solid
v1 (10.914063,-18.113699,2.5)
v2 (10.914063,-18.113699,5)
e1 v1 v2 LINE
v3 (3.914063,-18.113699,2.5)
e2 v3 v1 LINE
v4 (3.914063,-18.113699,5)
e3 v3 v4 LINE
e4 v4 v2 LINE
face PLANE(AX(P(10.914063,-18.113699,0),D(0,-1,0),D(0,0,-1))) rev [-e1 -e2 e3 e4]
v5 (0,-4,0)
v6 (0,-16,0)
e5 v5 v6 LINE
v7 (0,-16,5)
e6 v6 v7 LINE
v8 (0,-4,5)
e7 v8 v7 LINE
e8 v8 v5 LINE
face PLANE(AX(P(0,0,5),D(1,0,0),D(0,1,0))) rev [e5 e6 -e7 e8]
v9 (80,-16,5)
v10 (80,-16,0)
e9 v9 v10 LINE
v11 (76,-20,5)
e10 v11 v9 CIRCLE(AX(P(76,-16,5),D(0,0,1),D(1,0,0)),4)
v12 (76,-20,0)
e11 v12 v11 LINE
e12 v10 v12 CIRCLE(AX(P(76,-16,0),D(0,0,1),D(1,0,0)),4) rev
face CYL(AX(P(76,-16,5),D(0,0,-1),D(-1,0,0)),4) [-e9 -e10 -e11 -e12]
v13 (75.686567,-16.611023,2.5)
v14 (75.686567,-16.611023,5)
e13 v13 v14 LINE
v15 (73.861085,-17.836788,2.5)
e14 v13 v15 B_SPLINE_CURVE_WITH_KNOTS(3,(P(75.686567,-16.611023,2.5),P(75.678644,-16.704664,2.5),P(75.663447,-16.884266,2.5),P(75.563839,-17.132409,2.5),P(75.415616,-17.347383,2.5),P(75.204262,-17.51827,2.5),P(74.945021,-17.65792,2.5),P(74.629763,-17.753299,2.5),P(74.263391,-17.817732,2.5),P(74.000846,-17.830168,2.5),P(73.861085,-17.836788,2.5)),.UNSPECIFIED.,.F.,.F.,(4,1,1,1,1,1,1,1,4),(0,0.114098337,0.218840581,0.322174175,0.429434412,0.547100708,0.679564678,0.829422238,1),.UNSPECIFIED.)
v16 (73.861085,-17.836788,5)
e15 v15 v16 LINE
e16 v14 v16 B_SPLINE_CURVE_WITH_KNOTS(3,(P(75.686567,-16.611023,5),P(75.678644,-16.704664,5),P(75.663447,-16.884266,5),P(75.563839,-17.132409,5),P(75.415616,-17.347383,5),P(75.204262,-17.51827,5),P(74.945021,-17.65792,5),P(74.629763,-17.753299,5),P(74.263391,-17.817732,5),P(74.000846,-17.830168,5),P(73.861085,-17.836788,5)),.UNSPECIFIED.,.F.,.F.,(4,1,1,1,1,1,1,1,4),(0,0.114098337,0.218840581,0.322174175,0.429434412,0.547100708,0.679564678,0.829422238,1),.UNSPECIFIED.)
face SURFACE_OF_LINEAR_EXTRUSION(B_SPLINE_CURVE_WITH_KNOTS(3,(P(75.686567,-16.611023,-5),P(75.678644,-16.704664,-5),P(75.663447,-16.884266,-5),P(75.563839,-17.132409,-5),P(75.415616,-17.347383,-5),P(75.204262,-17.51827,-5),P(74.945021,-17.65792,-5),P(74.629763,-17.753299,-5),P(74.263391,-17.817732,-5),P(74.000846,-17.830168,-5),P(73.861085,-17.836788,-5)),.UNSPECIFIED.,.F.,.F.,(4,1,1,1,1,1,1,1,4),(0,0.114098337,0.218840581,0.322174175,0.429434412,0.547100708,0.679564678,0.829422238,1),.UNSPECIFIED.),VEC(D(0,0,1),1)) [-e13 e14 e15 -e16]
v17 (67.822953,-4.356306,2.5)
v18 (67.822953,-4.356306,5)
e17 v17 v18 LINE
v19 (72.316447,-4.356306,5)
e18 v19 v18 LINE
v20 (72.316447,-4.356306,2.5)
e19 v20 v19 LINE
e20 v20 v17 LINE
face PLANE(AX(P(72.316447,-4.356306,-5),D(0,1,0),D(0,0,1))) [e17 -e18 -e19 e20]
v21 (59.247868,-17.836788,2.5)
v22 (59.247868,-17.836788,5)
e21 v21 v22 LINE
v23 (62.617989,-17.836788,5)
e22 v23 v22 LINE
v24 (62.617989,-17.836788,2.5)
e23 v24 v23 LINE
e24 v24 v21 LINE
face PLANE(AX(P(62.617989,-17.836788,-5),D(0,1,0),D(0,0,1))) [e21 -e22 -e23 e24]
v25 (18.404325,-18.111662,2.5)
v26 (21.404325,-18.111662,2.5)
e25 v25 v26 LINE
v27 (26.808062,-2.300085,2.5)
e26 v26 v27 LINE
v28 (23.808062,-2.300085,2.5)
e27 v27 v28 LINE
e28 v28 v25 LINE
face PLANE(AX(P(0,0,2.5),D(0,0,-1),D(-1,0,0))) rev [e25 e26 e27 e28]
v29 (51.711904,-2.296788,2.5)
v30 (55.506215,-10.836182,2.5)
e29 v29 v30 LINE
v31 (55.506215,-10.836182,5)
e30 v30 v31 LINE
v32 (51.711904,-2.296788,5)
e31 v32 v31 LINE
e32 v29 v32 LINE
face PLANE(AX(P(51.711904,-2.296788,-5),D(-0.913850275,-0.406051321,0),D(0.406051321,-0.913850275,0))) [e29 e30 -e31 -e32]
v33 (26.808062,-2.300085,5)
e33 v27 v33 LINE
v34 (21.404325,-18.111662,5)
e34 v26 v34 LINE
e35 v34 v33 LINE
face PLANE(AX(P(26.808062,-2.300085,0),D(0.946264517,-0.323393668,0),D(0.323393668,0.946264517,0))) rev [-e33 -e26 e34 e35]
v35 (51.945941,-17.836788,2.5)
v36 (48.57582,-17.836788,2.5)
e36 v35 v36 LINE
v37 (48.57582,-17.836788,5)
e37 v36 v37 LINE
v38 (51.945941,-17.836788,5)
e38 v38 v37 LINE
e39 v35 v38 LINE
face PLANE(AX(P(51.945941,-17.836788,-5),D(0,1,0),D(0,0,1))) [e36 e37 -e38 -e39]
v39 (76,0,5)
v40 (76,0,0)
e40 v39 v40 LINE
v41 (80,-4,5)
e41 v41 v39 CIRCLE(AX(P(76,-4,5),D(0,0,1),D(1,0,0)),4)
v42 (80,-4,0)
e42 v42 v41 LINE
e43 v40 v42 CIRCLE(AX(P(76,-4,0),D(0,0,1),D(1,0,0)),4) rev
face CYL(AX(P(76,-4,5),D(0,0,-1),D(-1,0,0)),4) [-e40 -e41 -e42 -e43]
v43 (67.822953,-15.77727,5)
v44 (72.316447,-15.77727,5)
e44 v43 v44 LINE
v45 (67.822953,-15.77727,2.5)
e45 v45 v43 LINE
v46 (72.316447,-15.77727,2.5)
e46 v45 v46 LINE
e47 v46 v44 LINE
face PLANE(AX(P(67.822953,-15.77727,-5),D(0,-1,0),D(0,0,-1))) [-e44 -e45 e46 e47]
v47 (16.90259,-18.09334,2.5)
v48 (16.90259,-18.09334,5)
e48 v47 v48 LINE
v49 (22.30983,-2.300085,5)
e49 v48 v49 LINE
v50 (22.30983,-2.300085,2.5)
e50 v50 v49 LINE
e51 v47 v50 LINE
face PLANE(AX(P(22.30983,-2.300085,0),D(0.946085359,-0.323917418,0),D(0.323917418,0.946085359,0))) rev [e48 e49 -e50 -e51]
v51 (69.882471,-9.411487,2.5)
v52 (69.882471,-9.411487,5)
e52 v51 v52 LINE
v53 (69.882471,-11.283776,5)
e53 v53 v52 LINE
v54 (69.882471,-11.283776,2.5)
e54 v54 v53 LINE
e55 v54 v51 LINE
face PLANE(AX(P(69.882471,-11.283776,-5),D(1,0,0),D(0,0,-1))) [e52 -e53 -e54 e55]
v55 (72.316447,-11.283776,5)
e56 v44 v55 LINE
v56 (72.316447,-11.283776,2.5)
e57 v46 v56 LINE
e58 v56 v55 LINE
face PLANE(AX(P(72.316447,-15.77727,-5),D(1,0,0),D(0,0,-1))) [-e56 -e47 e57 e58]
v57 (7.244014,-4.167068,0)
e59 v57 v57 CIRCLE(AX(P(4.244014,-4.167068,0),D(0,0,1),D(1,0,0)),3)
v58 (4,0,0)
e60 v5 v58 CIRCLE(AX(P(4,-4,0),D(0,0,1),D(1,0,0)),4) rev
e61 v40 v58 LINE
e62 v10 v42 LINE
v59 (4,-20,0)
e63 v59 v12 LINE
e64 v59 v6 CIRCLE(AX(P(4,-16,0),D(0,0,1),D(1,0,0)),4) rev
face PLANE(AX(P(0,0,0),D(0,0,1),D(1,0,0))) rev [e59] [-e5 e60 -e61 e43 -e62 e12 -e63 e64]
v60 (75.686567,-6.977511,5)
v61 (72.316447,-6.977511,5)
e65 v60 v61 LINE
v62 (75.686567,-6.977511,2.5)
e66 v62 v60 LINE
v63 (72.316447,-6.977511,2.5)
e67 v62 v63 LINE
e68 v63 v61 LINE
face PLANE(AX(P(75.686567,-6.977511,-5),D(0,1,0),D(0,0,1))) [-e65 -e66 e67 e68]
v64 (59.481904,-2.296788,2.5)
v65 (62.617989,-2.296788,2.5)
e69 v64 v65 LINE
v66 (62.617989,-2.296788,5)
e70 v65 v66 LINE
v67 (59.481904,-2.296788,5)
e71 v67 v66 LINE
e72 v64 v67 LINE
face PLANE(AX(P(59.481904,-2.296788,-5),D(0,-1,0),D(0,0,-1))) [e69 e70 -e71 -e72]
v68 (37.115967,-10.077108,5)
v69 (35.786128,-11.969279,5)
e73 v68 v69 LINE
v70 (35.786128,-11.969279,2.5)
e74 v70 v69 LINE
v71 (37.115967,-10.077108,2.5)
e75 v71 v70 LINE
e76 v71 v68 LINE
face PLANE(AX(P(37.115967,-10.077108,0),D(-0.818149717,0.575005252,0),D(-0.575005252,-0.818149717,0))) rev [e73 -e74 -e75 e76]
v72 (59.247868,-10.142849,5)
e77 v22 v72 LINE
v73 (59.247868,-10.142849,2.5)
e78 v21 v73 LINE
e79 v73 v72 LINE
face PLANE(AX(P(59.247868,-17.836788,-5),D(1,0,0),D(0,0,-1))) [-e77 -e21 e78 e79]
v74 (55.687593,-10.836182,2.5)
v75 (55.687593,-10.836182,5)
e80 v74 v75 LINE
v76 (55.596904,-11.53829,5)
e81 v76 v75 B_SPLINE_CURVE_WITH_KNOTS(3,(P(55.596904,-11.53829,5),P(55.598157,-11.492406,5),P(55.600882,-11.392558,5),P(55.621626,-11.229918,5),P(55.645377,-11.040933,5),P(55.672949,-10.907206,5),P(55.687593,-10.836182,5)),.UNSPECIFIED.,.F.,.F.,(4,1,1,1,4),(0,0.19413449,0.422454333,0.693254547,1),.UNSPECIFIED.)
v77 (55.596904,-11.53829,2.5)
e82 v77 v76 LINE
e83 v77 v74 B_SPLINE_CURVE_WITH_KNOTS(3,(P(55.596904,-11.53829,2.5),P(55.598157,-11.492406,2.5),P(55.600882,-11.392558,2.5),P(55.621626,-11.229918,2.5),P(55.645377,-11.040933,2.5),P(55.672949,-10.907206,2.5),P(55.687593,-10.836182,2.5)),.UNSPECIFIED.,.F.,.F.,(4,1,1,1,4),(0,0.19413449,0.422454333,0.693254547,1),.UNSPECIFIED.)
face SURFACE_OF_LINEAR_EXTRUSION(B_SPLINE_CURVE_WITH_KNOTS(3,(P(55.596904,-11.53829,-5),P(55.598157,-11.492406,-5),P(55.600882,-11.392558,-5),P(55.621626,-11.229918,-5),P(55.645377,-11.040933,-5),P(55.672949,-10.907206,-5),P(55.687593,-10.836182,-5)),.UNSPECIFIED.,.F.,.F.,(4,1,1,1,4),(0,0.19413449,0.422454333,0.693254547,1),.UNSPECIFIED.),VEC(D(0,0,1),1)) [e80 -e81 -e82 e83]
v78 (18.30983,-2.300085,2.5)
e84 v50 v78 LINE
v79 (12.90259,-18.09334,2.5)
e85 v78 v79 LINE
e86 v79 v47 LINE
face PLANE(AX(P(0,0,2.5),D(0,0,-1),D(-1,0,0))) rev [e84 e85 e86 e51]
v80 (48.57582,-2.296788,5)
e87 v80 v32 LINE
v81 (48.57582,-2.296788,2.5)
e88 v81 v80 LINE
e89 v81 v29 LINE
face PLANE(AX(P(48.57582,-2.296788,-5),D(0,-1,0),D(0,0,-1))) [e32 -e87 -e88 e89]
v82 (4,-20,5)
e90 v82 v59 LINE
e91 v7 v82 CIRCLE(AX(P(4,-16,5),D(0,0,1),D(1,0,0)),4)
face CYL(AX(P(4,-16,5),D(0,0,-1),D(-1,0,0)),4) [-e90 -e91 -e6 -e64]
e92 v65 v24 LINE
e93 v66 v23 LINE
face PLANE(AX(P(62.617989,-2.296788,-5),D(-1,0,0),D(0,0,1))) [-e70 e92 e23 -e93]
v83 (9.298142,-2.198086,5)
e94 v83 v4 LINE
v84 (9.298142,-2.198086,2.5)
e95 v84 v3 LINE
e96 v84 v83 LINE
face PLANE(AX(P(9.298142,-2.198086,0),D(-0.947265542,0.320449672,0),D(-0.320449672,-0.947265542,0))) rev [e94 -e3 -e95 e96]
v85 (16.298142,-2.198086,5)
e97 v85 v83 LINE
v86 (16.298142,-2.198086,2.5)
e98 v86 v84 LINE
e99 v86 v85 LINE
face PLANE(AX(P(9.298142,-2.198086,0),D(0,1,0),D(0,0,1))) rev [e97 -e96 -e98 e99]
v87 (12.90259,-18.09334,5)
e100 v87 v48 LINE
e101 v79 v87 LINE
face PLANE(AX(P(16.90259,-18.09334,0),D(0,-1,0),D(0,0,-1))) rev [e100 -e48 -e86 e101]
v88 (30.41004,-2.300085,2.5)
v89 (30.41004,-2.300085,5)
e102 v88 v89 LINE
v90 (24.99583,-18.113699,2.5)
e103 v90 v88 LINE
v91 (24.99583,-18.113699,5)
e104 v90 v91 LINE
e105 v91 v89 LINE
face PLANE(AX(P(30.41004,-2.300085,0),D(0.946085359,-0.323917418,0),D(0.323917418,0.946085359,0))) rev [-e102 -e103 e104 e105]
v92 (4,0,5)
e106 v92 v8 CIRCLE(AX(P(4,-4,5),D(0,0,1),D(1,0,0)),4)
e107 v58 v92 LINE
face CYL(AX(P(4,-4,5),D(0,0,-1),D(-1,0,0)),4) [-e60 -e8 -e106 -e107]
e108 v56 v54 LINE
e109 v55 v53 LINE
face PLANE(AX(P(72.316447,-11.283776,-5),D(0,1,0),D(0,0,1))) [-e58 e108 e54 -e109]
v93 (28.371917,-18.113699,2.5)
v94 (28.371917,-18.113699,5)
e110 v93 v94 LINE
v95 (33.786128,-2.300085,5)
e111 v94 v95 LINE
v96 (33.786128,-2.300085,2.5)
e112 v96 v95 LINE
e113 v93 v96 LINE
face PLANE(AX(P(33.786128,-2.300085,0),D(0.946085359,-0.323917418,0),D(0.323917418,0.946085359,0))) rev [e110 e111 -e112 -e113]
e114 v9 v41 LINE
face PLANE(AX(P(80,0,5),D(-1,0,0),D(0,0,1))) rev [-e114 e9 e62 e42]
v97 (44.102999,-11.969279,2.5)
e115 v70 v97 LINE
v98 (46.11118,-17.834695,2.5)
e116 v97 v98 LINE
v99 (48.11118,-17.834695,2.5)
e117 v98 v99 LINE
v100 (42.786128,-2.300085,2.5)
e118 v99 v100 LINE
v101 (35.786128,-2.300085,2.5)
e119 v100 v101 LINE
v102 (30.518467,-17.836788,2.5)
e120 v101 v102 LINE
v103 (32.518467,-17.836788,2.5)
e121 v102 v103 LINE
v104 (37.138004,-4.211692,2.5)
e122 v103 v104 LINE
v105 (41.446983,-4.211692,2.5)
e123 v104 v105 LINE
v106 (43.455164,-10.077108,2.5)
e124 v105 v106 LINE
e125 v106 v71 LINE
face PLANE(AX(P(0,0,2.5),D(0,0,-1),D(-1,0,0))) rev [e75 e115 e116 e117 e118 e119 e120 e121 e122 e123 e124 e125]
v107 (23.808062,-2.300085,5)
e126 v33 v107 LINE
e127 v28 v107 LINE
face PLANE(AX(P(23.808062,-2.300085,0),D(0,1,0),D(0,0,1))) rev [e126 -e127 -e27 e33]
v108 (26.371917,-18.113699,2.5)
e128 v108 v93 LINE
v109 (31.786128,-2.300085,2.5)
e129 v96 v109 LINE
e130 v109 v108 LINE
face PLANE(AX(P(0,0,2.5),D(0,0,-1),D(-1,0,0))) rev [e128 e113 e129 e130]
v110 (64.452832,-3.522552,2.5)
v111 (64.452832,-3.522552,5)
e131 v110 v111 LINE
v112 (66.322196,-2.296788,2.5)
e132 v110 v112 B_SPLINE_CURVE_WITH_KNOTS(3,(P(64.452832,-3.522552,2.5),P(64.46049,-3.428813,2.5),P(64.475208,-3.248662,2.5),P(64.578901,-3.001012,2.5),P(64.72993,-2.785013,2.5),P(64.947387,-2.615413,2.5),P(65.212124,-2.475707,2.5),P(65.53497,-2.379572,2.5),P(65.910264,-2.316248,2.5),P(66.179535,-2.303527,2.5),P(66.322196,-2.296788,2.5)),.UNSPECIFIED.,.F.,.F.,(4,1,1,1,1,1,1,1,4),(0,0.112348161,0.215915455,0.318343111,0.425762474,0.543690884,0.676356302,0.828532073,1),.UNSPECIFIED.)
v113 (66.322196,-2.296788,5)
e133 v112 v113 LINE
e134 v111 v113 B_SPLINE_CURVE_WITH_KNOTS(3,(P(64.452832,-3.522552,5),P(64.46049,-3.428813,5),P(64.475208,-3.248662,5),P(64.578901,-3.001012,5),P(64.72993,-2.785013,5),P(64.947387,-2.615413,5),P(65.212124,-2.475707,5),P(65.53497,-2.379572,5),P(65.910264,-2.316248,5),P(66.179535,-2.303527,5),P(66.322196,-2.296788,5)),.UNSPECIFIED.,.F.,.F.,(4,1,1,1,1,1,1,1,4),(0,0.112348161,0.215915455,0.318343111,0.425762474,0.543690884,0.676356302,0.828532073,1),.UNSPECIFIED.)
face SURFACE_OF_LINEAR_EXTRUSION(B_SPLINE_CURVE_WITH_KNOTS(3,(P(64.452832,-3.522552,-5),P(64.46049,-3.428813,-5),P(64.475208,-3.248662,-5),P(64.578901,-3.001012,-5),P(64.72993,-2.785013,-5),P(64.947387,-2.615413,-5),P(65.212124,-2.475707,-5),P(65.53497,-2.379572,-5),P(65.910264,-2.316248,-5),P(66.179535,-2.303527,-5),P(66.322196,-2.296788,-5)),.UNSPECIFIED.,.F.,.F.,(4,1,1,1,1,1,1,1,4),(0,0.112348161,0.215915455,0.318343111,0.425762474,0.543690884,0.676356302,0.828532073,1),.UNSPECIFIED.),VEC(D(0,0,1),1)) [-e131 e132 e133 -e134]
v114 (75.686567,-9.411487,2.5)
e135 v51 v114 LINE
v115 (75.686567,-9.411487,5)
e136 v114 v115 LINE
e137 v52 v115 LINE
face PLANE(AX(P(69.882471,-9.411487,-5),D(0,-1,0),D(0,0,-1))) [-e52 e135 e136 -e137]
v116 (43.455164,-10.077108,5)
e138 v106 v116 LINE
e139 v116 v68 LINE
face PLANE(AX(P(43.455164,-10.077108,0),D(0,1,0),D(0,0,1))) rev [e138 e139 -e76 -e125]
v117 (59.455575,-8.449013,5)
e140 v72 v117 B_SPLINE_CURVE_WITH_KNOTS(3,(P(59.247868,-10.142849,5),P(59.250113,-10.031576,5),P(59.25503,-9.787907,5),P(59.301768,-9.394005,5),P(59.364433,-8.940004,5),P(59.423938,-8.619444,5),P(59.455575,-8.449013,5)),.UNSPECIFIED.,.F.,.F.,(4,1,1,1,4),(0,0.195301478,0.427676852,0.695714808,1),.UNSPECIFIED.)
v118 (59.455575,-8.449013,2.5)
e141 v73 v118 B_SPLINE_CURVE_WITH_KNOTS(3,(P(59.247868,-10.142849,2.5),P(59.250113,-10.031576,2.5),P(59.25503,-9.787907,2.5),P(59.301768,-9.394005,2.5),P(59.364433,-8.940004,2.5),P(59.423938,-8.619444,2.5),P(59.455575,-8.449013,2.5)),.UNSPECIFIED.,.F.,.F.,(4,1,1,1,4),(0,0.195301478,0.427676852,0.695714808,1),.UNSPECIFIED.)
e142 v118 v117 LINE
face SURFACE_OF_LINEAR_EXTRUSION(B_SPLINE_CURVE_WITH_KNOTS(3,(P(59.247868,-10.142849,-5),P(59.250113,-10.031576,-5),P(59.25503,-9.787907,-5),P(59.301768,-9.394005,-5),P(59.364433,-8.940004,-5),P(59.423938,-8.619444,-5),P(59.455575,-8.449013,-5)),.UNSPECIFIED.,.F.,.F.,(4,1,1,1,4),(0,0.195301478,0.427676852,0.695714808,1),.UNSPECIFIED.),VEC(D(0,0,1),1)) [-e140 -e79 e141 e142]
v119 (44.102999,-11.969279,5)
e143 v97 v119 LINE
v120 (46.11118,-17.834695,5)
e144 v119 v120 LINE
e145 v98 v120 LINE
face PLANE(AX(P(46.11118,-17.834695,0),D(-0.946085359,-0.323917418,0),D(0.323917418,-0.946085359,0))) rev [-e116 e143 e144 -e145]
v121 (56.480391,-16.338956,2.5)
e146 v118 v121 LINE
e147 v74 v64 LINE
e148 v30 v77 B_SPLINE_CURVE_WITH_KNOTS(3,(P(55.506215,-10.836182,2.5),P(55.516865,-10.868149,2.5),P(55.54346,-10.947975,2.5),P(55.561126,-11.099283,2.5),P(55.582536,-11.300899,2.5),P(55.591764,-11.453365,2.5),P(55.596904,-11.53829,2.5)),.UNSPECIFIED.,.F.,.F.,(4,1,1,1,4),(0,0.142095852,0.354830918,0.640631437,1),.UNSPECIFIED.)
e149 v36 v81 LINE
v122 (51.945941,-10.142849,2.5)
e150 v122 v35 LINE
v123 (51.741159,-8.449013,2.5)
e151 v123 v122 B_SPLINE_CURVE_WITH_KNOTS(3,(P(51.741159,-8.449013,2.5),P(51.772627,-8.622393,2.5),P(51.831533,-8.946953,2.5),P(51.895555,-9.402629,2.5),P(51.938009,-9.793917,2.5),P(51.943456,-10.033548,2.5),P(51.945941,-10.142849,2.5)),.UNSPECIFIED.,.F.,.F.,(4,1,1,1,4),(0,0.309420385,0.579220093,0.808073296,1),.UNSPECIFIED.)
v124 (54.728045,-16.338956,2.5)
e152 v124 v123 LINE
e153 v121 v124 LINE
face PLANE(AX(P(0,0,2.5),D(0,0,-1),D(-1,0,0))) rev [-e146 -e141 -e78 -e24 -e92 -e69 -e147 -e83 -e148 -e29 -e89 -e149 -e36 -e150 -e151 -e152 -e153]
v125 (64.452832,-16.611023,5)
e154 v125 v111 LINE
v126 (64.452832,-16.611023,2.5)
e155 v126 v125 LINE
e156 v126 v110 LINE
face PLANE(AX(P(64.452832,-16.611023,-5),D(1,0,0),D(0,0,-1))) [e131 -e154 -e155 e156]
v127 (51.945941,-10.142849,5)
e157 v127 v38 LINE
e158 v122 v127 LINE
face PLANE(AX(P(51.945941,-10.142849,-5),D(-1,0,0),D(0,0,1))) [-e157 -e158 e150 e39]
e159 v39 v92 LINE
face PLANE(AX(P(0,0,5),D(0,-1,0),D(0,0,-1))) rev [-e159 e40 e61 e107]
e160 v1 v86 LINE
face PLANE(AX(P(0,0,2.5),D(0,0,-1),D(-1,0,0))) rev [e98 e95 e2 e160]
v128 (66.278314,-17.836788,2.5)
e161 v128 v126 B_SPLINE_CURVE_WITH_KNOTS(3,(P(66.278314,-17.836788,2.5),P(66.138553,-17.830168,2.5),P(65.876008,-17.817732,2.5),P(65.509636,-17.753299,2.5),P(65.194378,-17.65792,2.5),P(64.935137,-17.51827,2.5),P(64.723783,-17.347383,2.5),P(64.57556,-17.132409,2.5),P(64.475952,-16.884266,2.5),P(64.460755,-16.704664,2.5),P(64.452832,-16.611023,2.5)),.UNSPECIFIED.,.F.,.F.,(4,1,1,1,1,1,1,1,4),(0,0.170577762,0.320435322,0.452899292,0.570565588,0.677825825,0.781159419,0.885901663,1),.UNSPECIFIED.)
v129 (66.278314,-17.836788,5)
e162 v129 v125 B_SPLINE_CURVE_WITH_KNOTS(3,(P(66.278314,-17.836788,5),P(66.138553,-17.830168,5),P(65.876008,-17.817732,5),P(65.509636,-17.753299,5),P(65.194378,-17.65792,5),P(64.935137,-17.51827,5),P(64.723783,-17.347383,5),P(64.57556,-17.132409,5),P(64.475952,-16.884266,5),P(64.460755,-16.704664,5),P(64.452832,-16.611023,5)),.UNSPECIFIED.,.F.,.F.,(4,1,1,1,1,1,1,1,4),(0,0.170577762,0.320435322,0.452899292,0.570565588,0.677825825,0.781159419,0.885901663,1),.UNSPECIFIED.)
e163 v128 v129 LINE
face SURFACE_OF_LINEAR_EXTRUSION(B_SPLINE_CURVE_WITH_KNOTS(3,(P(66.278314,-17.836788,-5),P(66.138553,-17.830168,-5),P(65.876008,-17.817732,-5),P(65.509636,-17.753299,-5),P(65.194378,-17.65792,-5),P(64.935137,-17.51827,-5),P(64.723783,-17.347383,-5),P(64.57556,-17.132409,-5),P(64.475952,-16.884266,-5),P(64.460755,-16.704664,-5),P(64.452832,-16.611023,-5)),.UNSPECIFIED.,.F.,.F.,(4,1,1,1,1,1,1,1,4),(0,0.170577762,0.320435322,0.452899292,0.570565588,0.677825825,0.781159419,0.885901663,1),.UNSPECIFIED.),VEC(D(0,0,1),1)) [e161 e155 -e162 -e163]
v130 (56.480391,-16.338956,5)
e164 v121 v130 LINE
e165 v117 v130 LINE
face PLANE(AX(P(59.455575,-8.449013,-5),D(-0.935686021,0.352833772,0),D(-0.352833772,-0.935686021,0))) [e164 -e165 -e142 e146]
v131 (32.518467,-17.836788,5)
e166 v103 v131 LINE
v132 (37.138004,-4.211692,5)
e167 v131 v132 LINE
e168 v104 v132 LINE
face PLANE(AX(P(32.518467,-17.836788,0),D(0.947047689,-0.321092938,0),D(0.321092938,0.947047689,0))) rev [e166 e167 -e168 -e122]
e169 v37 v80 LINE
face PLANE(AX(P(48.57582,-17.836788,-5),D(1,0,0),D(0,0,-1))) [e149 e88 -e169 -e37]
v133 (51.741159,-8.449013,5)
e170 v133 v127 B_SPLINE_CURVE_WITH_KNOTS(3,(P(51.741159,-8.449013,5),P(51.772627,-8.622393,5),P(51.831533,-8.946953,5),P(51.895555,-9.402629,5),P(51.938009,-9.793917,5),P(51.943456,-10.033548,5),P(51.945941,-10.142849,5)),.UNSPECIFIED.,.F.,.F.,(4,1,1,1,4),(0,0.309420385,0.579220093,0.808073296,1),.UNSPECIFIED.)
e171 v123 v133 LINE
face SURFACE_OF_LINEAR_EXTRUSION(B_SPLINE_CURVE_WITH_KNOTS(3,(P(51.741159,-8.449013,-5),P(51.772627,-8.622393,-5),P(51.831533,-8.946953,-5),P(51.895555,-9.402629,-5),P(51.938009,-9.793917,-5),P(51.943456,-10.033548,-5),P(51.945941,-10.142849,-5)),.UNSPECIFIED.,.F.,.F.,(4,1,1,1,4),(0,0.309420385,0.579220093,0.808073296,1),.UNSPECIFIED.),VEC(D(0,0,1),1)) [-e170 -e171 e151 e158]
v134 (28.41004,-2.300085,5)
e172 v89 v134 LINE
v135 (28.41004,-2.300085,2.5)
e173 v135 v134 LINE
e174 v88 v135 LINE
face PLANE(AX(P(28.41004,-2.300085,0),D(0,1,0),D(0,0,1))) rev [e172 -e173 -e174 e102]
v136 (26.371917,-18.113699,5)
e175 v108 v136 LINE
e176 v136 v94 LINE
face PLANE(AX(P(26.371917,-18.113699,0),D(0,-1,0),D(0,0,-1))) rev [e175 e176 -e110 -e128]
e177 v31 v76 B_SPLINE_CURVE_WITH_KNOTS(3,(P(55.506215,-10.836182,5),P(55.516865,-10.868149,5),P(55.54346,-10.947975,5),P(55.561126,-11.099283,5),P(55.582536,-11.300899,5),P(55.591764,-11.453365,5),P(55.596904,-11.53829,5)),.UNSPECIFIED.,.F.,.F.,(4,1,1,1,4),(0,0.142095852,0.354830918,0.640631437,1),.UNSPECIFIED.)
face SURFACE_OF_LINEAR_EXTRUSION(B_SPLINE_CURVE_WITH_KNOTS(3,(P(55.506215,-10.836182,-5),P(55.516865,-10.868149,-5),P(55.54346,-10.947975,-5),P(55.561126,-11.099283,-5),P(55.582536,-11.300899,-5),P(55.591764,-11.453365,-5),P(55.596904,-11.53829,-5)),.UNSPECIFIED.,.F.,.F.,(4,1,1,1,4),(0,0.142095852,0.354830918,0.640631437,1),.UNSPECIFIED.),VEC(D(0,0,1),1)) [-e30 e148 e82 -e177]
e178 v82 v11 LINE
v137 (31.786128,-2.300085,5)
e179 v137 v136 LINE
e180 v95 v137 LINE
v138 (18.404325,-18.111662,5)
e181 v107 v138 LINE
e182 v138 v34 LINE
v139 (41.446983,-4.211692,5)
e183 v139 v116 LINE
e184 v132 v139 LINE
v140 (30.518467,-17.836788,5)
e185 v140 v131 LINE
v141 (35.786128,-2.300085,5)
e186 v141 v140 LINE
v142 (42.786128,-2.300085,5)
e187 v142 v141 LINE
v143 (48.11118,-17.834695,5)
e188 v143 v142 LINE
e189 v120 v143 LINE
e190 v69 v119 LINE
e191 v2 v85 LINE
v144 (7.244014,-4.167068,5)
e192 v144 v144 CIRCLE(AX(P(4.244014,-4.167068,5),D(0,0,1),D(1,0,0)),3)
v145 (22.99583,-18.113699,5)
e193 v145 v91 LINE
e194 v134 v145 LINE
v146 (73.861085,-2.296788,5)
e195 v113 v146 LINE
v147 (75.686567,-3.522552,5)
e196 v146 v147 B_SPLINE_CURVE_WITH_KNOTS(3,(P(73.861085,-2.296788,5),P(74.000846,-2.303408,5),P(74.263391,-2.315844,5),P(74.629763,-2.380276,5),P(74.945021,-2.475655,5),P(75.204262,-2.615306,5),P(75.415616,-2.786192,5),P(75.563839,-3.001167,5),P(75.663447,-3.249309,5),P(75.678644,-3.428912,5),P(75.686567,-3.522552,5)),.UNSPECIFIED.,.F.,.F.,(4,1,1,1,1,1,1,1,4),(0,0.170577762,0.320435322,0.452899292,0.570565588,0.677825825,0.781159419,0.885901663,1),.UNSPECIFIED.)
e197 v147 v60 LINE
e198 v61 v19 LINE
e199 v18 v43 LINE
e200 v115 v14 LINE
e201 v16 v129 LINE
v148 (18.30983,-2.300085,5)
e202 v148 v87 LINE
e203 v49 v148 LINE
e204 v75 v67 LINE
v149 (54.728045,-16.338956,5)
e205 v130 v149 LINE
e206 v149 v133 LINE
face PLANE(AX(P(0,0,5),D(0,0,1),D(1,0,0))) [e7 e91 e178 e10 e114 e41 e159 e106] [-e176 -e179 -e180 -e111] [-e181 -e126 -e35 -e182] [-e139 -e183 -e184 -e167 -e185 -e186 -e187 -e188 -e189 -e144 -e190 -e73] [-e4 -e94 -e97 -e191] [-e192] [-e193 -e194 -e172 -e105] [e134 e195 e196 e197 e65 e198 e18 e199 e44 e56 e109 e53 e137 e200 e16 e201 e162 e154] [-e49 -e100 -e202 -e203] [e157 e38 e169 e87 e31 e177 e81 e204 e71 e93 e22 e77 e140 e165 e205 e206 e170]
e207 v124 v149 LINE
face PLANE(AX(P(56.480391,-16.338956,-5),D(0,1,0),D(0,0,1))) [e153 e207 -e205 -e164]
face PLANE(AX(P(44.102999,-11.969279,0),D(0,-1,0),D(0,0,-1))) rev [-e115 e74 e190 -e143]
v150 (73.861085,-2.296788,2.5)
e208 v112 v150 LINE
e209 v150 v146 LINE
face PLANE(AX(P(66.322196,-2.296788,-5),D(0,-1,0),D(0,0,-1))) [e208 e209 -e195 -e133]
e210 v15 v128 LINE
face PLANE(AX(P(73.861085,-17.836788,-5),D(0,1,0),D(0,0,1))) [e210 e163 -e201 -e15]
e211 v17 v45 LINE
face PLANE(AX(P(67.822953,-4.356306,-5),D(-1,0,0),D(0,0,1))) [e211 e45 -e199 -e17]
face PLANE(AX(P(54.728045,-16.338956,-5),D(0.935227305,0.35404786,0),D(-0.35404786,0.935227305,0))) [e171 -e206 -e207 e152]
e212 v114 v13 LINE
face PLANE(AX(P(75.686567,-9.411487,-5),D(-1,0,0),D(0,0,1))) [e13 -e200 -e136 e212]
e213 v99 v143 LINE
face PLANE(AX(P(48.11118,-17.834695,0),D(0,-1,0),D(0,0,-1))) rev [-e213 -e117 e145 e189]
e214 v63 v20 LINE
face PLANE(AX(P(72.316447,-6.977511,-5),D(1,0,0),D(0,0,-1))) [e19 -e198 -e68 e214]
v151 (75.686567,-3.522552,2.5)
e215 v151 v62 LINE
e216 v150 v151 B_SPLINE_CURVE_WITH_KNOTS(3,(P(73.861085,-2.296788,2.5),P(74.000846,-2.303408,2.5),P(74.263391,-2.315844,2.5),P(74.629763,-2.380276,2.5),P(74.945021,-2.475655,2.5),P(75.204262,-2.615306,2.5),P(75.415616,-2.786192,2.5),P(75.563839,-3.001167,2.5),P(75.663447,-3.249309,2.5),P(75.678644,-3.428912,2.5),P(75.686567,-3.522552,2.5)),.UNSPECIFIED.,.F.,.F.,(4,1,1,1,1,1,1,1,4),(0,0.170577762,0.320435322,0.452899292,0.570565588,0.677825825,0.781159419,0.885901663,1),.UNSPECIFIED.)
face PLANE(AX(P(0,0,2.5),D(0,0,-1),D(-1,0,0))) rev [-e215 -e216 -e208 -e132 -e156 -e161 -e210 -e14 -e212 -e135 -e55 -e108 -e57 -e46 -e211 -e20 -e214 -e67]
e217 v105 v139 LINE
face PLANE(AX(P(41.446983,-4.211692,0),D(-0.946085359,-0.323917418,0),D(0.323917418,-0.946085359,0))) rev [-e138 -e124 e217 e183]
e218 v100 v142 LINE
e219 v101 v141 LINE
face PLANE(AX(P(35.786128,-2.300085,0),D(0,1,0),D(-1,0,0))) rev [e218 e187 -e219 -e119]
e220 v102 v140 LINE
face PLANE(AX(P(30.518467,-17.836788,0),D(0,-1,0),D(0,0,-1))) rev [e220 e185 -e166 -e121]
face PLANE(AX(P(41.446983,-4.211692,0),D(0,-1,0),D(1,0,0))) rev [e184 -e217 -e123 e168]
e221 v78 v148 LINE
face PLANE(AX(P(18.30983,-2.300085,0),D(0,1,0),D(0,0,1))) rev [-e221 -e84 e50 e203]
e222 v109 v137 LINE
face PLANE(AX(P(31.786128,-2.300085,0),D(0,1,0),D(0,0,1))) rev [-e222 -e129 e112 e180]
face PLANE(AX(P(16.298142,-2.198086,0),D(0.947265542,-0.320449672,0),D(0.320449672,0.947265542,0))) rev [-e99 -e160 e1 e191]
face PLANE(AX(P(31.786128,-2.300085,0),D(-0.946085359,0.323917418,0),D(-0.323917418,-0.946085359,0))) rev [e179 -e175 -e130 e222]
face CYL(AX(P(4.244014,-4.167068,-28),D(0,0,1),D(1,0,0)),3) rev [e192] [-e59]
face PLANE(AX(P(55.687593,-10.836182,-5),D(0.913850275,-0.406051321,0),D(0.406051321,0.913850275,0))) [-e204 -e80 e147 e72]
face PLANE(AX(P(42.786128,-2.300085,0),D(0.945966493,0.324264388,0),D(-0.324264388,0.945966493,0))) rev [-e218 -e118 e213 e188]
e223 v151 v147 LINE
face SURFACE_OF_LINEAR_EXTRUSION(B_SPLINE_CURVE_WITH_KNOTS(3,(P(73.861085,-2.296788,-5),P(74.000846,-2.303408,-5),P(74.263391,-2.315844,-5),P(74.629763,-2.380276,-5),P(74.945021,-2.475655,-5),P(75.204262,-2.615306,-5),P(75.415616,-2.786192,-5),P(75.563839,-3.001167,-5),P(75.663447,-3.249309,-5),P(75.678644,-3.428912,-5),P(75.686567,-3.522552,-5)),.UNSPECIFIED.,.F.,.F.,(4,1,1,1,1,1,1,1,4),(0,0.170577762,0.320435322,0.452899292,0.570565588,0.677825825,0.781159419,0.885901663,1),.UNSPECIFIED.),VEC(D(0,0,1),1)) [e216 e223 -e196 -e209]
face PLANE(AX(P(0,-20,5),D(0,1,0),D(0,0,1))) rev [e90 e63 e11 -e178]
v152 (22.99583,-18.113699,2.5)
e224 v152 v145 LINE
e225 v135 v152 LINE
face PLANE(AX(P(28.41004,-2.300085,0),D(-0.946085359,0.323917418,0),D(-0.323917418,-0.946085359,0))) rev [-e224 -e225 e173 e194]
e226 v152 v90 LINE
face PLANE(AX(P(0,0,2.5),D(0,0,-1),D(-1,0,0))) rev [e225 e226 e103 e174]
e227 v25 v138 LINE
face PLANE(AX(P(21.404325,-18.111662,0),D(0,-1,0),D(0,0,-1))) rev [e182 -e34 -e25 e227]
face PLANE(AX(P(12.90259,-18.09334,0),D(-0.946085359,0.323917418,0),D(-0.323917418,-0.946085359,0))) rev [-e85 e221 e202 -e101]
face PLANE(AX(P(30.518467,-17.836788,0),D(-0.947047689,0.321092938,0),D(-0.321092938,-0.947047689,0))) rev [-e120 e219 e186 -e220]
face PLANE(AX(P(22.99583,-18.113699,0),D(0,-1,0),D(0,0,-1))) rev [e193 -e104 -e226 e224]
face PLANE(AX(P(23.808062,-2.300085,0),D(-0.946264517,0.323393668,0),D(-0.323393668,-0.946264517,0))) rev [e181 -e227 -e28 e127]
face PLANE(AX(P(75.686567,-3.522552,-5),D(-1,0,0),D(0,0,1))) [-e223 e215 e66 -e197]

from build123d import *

# Parameters (mm, degrees)
ESQUISSE1_W                  = 80
ESQUISSE1_H                  = 20
BOSS_EXTRU_1_DEPTH           = 5
CONG_1_R                     = 4
ENL_V_MAT_EXTRU_1_DEPTH      = 83.613558209
ENL_V_START                  = -5
ENL_V_MAT_EXTRU_2_DEPTH      = 5
ESQUISSE11_W                 = 13.611032385
ESQUISSE11_H                 = 17.64061434
BOSS_EXTRU_8_DEPTH           = 5
ENL_V_MAT_EXTRU_3_DEPTH      = 83.613558336
ENL_V_MAT_EXTRU_3_DEPTH_BACK = 83.613558336
ESQUISSE13_R                 = 3
ENL_V_MAT_EXTRU_4_DEPTH      = 33
BOSS_EXTRU_9_DEPTH           = 2.5


# Read off the part's stored shape, not the designer's step: Enlèv. mat.-Extru.2
with BuildPart() as part:
    # Esquisse1 → Boss.-Extru.1 (new body)
    with BuildSketch(Plane.XY):
        with Locations((40, -10)):
            Rectangle(ESQUISSE1_W, ESQUISSE1_H)
    extrude(amount=BOSS_EXTRU_1_DEPTH)

    # Congé1
    cong_1_edges = [part.edges().sort_by_distance(p)[0] for p in [
        (0, 0, 2.5),
        (80, 0, 2.5),
        (80, -20, 2.5),
        (0, -20, 2.5),
    ]]
    fillet(cong_1_edges, radius=CONG_1_R)

    # Esquisse2 → Enlèv. mat.-Extru.1 (cut, through all)
    with BuildSketch(Plane.XY.offset(5)):
        Polygon((28.410040172, -2.300084773), (30.410040172, -2.300084773), (24.995829866, -18.113699025), (22.995829866, -18.113699025), align=None)
        Polygon((9.298142424, -2.198086037), (16.298142424, -2.198086037), (10.914062948, -18.113699025), (3.914062948, -18.113699025), align=None)
        Polygon((18.309829725, -2.300084773), (22.309829725, -2.300084773), (16.902589817, -18.093340154), (12.902589817, -18.093340154), align=None)
        Polygon((23.808061727, -2.300084773), (26.808061727, -2.300084773), (21.404325417, -18.111661936), (18.404325417, -18.111661936), align=None)
        Polygon((31.786127586, -2.300084773), (33.786127586, -2.300084773), (28.371917279, -18.113699025), (26.371917279, -18.113699025), align=None)
    extrude(amount=-ENL_V_MAT_EXTRU_1_DEPTH, mode=Mode.SUBTRACT)

    # Enlèv. mat.-Extru.2 outline → Enlèv. mat.-Extru.2 (cut)
    # profile 1 of 3: a face of its own
    with BuildSketch(Plane.XY.offset(5).offset(ENL_V_START)):
        with BuildLine():
            add(Edge.make_bspline(
                [(75.686567024, -16.611023442), (75.678643784, -16.704663886), (75.663447013, -16.884266233), (75.563839443, -17.132408637), (75.415616385, -17.347383223), (75.204262037, -17.518269705), (74.945020643, -17.657920052), (74.629763147, -17.753299102), (74.263391467, -17.817731699), (74.000846179, -17.830167685), (73.861085096, -17.83678775)],
                knots=[0, 0, 0, 0, 0.114098337, 0.218840581, 0.322174175, 0.429434412, 0.547100708, 0.679564678, 0.829422238, 1, 1, 1, 1], degree=3))
            Line((75.686567024, -16.611023442), (75.686567024, -9.411486545))
            Line((75.686567024, -9.411486545), (69.882470639, -9.411486545))
            Line((69.882470639, -9.411486545), (69.882470639, -11.283775701))
            Line((69.882470639, -11.283775701), (72.316446542, -11.283775701))
            Line((72.316446542, -11.283775701), (72.316446542, -15.777269677))
            Line((72.316446542, -15.777269677), (67.822952566, -15.777269677))
            Line((67.822952566, -15.777269677), (67.822952566, -4.356305822))
            Line((67.822952566, -4.356305822), (72.316446542, -4.356305822))
            Line((72.316446542, -4.356305822), (72.316446542, -6.977510641))
            Line((72.316446542, -6.977510641), (75.686567024, -6.977510641))
            Line((75.686567024, -6.977510641), (75.686567024, -3.522552057))
            add(Edge.make_bspline(
                [(73.861085096, -2.29678775), (74.000846179, -2.303407815), (74.263391467, -2.3158438), (74.629763147, -2.380276397), (74.945020643, -2.475655447), (75.204262037, -2.615305794), (75.415616385, -2.786192276), (75.563839443, -3.001166862), (75.663447013, -3.249309266), (75.678643784, -3.428911613), (75.686567024, -3.522552057)],
                knots=[0, 0, 0, 0, 0.170577762, 0.320435322, 0.452899292, 0.570565588, 0.677825825, 0.781159419, 0.885901663, 1, 1, 1, 1], degree=3))
            Line((73.861085096, -2.29678775), (66.322195789, -2.29678775))
            add(Edge.make_bspline(
                [(64.452832084, -3.522552057), (64.460490101, -3.428813179), (64.475207603, -3.248661832), (64.578900626, -3.001012416), (64.72992953, -2.785012839), (64.947387079, -2.615412784), (65.212124175, -2.475706721), (65.534969931, -2.379572165), (65.910264022, -2.316247539), (66.179534857, -2.303527098), (66.322195789, -2.29678775)],
                knots=[0, 0, 0, 0, 0.112348161, 0.215915455, 0.318343111, 0.425762474, 0.543690884, 0.676356302, 0.828532073, 1, 1, 1, 1], degree=3))
            Line((64.452832084, -3.522552057), (64.452832084, -16.611023442))
            add(Edge.make_bspline(
                [(66.278314012, -17.83678775), (66.138552929, -17.830167685), (65.876007642, -17.817731699), (65.509635961, -17.753299102), (65.194378466, -17.657920052), (64.935137072, -17.518269705), (64.723782723, -17.347383223), (64.575559665, -17.132408637), (64.475952096, -16.884266233), (64.460755324, -16.704663886), (64.452832084, -16.611023442)],
                knots=[0, 0, 0, 0, 0.170577762, 0.320435322, 0.452899292, 0.570565588, 0.677825825, 0.781159419, 0.885901663, 1, 1, 1, 1], degree=3))
            Line((66.278314012, -17.83678775), (73.861085096, -17.83678775))
        make_face()
    # profile 2 of 3: a face of its own
    with BuildSketch(Plane.XY.offset(5).offset(ENL_V_START)):
        with BuildLine():
            add(Edge.make_bspline(
                [(59.247868229, -10.142849497), (59.250113416, -10.031576234), (59.255029992, -9.787906808), (59.301768342, -9.394005261), (59.364432817, -8.9400039), (59.423938248, -8.619443962), (59.455575307, -8.4490129)],
                knots=[0, 0, 0, 0, 0.195301478, 0.427676852, 0.695714808, 1, 1, 1, 1], degree=3))
            Line((59.247868229, -10.142849497), (59.247868229, -17.83678775))
            Line((59.247868229, -17.83678775), (62.617988711, -17.83678775))
            Line((62.617988711, -17.83678775), (62.617988711, -2.29678775))
            Line((62.617988711, -2.29678775), (59.481904374, -2.29678775))
            Line((59.481904374, -2.29678775), (55.68759338, -10.836181575))
            add(Edge.make_bspline(
                [(55.596904374, -11.538290009), (55.59815665, -11.492405908), (55.600881716, -11.392557927), (55.62162629, -11.229918497), (55.645376833, -11.040932864), (55.672949182, -10.907206292), (55.68759338, -10.836181575)],
                knots=[0, 0, 0, 0, 0.19413449, 0.422454333, 0.693254547, 1, 1, 1, 1], degree=3))
            add(Edge.make_bspline(
                [(55.506215368, -10.836181575), (55.516865461, -10.868148772), (55.54346006, -10.947974815), (55.561126156, -11.099283482), (55.582536457, -11.300899182), (55.59176432, -11.45336457), (55.596904374, -11.538290009)],
                knots=[0, 0, 0, 0, 0.142095852, 0.354830918, 0.640631437, 1, 1, 1, 1], degree=3))
            Line((55.506215368, -10.836181575), (51.711904374, -2.29678775))
            Line((51.711904374, -2.29678775), (48.575820036, -2.29678775))
            Line((48.575820036, -2.29678775), (48.575820036, -17.83678775))
            Line((48.575820036, -17.83678775), (51.945940518, -17.83678775))
            Line((51.945940518, -17.83678775), (51.945940518, -10.142849497))
            add(Edge.make_bspline(
                [(51.741158892, -8.4490129), (51.77262663, -8.62239324), (51.831532725, -8.946952903), (51.895555168, -9.402629403), (51.938009232, -9.793916754), (51.94345609, -10.033548389), (51.945940518, -10.142849497)],
                knots=[0, 0, 0, 0, 0.309420385, 0.579220093, 0.808073296, 1, 1, 1, 1], degree=3))
            Line((51.741158892, -8.4490129), (54.728045187, -16.338956424))
            Line((54.728045187, -16.338956424), (56.480390819, -16.338956424))
            Line((56.480390819, -16.338956424), (59.455575307, -8.4490129))
        make_face()
    # profile 3 of 3: a face of its own
    with BuildSketch(Plane.XY.offset(5).offset(ENL_V_START)):
        Polygon((44.119771843, -17.83678775), (47.489892325, -17.83678775), (43.019801964, -2.29678775), (39.439048952, -2.29678775), (34.945554976, -17.795831424), (34.945554976, -17.83678775), (38.315675458, -17.83678775), (39.023634795, -15.028354015), (43.41766341, -15.028354015), align=None)
        Polygon((41.217723651, -5.921422539), (42.923262054, -12.968835942), (39.488781633, -12.968835942), align=None, mode=Mode.SUBTRACT)
    extrude(amount=ENL_V_MAT_EXTRU_2_DEPTH, mode=Mode.SUBTRACT)

    # Esquisse11 → Boss.-Extru.8 (add)
    with BuildSketch(Plane.XY.offset(5)):
        with Locations((41.097921838, -10.121676789)):
            Rectangle(ESQUISSE11_W, ESQUISSE11_H)
    extrude(amount=-BOSS_EXTRU_8_DEPTH)

    # Esquisse12 → Enlèv. mat.-Extru.3 (cut, two sides: drawn at the far end of the back side and taken through both)
    with BuildSketch(Plane.XY.offset(5).offset(-ENL_V_MAT_EXTRU_3_DEPTH_BACK)):
        Polygon((35.786127586, -2.300084773), (42.786127586, -2.300084773), (48.111179633, -17.834694794), (46.111179633, -17.834694794), (44.102998893, -11.969278829), (35.786127586, -11.969278829), (37.115967439, -10.077108111), (43.455164056, -10.077108111), (41.446983316, -4.211692145), (37.138004335, -4.211692145), (32.518467193, -17.83678775), (30.518467193, -17.83678775), align=None)
    extrude(amount=ENL_V_MAT_EXTRU_3_DEPTH + ENL_V_MAT_EXTRU_3_DEPTH_BACK, mode=Mode.SUBTRACT)

    # Esquisse13 → Enlèv. mat.-Extru.4 (cut)
    with BuildSketch(Plane.XY.offset(5)):
        with Locations((4.24401363, -4.167068495)):
            Circle(ESQUISSE13_R)
    extrude(amount=-ENL_V_MAT_EXTRU_4_DEPTH, mode=Mode.SUBTRACT)

    # Esquisse14 → Boss.-Extru.9 (add)
    with BuildSketch(Plane(origin=(0, 0, 0), x_dir=(-1, 0, 0), z_dir=(0, 0, -1))):
        Polygon((-76.993137328, -1.775197305), (-76.993137328, -18.151298047), (-3.246627444, -18.151298047), (-8.832660873, -1.775197305), align=None)
    extrude(amount=-BOSS_EXTRU_9_DEPTH)


solid = part.part
